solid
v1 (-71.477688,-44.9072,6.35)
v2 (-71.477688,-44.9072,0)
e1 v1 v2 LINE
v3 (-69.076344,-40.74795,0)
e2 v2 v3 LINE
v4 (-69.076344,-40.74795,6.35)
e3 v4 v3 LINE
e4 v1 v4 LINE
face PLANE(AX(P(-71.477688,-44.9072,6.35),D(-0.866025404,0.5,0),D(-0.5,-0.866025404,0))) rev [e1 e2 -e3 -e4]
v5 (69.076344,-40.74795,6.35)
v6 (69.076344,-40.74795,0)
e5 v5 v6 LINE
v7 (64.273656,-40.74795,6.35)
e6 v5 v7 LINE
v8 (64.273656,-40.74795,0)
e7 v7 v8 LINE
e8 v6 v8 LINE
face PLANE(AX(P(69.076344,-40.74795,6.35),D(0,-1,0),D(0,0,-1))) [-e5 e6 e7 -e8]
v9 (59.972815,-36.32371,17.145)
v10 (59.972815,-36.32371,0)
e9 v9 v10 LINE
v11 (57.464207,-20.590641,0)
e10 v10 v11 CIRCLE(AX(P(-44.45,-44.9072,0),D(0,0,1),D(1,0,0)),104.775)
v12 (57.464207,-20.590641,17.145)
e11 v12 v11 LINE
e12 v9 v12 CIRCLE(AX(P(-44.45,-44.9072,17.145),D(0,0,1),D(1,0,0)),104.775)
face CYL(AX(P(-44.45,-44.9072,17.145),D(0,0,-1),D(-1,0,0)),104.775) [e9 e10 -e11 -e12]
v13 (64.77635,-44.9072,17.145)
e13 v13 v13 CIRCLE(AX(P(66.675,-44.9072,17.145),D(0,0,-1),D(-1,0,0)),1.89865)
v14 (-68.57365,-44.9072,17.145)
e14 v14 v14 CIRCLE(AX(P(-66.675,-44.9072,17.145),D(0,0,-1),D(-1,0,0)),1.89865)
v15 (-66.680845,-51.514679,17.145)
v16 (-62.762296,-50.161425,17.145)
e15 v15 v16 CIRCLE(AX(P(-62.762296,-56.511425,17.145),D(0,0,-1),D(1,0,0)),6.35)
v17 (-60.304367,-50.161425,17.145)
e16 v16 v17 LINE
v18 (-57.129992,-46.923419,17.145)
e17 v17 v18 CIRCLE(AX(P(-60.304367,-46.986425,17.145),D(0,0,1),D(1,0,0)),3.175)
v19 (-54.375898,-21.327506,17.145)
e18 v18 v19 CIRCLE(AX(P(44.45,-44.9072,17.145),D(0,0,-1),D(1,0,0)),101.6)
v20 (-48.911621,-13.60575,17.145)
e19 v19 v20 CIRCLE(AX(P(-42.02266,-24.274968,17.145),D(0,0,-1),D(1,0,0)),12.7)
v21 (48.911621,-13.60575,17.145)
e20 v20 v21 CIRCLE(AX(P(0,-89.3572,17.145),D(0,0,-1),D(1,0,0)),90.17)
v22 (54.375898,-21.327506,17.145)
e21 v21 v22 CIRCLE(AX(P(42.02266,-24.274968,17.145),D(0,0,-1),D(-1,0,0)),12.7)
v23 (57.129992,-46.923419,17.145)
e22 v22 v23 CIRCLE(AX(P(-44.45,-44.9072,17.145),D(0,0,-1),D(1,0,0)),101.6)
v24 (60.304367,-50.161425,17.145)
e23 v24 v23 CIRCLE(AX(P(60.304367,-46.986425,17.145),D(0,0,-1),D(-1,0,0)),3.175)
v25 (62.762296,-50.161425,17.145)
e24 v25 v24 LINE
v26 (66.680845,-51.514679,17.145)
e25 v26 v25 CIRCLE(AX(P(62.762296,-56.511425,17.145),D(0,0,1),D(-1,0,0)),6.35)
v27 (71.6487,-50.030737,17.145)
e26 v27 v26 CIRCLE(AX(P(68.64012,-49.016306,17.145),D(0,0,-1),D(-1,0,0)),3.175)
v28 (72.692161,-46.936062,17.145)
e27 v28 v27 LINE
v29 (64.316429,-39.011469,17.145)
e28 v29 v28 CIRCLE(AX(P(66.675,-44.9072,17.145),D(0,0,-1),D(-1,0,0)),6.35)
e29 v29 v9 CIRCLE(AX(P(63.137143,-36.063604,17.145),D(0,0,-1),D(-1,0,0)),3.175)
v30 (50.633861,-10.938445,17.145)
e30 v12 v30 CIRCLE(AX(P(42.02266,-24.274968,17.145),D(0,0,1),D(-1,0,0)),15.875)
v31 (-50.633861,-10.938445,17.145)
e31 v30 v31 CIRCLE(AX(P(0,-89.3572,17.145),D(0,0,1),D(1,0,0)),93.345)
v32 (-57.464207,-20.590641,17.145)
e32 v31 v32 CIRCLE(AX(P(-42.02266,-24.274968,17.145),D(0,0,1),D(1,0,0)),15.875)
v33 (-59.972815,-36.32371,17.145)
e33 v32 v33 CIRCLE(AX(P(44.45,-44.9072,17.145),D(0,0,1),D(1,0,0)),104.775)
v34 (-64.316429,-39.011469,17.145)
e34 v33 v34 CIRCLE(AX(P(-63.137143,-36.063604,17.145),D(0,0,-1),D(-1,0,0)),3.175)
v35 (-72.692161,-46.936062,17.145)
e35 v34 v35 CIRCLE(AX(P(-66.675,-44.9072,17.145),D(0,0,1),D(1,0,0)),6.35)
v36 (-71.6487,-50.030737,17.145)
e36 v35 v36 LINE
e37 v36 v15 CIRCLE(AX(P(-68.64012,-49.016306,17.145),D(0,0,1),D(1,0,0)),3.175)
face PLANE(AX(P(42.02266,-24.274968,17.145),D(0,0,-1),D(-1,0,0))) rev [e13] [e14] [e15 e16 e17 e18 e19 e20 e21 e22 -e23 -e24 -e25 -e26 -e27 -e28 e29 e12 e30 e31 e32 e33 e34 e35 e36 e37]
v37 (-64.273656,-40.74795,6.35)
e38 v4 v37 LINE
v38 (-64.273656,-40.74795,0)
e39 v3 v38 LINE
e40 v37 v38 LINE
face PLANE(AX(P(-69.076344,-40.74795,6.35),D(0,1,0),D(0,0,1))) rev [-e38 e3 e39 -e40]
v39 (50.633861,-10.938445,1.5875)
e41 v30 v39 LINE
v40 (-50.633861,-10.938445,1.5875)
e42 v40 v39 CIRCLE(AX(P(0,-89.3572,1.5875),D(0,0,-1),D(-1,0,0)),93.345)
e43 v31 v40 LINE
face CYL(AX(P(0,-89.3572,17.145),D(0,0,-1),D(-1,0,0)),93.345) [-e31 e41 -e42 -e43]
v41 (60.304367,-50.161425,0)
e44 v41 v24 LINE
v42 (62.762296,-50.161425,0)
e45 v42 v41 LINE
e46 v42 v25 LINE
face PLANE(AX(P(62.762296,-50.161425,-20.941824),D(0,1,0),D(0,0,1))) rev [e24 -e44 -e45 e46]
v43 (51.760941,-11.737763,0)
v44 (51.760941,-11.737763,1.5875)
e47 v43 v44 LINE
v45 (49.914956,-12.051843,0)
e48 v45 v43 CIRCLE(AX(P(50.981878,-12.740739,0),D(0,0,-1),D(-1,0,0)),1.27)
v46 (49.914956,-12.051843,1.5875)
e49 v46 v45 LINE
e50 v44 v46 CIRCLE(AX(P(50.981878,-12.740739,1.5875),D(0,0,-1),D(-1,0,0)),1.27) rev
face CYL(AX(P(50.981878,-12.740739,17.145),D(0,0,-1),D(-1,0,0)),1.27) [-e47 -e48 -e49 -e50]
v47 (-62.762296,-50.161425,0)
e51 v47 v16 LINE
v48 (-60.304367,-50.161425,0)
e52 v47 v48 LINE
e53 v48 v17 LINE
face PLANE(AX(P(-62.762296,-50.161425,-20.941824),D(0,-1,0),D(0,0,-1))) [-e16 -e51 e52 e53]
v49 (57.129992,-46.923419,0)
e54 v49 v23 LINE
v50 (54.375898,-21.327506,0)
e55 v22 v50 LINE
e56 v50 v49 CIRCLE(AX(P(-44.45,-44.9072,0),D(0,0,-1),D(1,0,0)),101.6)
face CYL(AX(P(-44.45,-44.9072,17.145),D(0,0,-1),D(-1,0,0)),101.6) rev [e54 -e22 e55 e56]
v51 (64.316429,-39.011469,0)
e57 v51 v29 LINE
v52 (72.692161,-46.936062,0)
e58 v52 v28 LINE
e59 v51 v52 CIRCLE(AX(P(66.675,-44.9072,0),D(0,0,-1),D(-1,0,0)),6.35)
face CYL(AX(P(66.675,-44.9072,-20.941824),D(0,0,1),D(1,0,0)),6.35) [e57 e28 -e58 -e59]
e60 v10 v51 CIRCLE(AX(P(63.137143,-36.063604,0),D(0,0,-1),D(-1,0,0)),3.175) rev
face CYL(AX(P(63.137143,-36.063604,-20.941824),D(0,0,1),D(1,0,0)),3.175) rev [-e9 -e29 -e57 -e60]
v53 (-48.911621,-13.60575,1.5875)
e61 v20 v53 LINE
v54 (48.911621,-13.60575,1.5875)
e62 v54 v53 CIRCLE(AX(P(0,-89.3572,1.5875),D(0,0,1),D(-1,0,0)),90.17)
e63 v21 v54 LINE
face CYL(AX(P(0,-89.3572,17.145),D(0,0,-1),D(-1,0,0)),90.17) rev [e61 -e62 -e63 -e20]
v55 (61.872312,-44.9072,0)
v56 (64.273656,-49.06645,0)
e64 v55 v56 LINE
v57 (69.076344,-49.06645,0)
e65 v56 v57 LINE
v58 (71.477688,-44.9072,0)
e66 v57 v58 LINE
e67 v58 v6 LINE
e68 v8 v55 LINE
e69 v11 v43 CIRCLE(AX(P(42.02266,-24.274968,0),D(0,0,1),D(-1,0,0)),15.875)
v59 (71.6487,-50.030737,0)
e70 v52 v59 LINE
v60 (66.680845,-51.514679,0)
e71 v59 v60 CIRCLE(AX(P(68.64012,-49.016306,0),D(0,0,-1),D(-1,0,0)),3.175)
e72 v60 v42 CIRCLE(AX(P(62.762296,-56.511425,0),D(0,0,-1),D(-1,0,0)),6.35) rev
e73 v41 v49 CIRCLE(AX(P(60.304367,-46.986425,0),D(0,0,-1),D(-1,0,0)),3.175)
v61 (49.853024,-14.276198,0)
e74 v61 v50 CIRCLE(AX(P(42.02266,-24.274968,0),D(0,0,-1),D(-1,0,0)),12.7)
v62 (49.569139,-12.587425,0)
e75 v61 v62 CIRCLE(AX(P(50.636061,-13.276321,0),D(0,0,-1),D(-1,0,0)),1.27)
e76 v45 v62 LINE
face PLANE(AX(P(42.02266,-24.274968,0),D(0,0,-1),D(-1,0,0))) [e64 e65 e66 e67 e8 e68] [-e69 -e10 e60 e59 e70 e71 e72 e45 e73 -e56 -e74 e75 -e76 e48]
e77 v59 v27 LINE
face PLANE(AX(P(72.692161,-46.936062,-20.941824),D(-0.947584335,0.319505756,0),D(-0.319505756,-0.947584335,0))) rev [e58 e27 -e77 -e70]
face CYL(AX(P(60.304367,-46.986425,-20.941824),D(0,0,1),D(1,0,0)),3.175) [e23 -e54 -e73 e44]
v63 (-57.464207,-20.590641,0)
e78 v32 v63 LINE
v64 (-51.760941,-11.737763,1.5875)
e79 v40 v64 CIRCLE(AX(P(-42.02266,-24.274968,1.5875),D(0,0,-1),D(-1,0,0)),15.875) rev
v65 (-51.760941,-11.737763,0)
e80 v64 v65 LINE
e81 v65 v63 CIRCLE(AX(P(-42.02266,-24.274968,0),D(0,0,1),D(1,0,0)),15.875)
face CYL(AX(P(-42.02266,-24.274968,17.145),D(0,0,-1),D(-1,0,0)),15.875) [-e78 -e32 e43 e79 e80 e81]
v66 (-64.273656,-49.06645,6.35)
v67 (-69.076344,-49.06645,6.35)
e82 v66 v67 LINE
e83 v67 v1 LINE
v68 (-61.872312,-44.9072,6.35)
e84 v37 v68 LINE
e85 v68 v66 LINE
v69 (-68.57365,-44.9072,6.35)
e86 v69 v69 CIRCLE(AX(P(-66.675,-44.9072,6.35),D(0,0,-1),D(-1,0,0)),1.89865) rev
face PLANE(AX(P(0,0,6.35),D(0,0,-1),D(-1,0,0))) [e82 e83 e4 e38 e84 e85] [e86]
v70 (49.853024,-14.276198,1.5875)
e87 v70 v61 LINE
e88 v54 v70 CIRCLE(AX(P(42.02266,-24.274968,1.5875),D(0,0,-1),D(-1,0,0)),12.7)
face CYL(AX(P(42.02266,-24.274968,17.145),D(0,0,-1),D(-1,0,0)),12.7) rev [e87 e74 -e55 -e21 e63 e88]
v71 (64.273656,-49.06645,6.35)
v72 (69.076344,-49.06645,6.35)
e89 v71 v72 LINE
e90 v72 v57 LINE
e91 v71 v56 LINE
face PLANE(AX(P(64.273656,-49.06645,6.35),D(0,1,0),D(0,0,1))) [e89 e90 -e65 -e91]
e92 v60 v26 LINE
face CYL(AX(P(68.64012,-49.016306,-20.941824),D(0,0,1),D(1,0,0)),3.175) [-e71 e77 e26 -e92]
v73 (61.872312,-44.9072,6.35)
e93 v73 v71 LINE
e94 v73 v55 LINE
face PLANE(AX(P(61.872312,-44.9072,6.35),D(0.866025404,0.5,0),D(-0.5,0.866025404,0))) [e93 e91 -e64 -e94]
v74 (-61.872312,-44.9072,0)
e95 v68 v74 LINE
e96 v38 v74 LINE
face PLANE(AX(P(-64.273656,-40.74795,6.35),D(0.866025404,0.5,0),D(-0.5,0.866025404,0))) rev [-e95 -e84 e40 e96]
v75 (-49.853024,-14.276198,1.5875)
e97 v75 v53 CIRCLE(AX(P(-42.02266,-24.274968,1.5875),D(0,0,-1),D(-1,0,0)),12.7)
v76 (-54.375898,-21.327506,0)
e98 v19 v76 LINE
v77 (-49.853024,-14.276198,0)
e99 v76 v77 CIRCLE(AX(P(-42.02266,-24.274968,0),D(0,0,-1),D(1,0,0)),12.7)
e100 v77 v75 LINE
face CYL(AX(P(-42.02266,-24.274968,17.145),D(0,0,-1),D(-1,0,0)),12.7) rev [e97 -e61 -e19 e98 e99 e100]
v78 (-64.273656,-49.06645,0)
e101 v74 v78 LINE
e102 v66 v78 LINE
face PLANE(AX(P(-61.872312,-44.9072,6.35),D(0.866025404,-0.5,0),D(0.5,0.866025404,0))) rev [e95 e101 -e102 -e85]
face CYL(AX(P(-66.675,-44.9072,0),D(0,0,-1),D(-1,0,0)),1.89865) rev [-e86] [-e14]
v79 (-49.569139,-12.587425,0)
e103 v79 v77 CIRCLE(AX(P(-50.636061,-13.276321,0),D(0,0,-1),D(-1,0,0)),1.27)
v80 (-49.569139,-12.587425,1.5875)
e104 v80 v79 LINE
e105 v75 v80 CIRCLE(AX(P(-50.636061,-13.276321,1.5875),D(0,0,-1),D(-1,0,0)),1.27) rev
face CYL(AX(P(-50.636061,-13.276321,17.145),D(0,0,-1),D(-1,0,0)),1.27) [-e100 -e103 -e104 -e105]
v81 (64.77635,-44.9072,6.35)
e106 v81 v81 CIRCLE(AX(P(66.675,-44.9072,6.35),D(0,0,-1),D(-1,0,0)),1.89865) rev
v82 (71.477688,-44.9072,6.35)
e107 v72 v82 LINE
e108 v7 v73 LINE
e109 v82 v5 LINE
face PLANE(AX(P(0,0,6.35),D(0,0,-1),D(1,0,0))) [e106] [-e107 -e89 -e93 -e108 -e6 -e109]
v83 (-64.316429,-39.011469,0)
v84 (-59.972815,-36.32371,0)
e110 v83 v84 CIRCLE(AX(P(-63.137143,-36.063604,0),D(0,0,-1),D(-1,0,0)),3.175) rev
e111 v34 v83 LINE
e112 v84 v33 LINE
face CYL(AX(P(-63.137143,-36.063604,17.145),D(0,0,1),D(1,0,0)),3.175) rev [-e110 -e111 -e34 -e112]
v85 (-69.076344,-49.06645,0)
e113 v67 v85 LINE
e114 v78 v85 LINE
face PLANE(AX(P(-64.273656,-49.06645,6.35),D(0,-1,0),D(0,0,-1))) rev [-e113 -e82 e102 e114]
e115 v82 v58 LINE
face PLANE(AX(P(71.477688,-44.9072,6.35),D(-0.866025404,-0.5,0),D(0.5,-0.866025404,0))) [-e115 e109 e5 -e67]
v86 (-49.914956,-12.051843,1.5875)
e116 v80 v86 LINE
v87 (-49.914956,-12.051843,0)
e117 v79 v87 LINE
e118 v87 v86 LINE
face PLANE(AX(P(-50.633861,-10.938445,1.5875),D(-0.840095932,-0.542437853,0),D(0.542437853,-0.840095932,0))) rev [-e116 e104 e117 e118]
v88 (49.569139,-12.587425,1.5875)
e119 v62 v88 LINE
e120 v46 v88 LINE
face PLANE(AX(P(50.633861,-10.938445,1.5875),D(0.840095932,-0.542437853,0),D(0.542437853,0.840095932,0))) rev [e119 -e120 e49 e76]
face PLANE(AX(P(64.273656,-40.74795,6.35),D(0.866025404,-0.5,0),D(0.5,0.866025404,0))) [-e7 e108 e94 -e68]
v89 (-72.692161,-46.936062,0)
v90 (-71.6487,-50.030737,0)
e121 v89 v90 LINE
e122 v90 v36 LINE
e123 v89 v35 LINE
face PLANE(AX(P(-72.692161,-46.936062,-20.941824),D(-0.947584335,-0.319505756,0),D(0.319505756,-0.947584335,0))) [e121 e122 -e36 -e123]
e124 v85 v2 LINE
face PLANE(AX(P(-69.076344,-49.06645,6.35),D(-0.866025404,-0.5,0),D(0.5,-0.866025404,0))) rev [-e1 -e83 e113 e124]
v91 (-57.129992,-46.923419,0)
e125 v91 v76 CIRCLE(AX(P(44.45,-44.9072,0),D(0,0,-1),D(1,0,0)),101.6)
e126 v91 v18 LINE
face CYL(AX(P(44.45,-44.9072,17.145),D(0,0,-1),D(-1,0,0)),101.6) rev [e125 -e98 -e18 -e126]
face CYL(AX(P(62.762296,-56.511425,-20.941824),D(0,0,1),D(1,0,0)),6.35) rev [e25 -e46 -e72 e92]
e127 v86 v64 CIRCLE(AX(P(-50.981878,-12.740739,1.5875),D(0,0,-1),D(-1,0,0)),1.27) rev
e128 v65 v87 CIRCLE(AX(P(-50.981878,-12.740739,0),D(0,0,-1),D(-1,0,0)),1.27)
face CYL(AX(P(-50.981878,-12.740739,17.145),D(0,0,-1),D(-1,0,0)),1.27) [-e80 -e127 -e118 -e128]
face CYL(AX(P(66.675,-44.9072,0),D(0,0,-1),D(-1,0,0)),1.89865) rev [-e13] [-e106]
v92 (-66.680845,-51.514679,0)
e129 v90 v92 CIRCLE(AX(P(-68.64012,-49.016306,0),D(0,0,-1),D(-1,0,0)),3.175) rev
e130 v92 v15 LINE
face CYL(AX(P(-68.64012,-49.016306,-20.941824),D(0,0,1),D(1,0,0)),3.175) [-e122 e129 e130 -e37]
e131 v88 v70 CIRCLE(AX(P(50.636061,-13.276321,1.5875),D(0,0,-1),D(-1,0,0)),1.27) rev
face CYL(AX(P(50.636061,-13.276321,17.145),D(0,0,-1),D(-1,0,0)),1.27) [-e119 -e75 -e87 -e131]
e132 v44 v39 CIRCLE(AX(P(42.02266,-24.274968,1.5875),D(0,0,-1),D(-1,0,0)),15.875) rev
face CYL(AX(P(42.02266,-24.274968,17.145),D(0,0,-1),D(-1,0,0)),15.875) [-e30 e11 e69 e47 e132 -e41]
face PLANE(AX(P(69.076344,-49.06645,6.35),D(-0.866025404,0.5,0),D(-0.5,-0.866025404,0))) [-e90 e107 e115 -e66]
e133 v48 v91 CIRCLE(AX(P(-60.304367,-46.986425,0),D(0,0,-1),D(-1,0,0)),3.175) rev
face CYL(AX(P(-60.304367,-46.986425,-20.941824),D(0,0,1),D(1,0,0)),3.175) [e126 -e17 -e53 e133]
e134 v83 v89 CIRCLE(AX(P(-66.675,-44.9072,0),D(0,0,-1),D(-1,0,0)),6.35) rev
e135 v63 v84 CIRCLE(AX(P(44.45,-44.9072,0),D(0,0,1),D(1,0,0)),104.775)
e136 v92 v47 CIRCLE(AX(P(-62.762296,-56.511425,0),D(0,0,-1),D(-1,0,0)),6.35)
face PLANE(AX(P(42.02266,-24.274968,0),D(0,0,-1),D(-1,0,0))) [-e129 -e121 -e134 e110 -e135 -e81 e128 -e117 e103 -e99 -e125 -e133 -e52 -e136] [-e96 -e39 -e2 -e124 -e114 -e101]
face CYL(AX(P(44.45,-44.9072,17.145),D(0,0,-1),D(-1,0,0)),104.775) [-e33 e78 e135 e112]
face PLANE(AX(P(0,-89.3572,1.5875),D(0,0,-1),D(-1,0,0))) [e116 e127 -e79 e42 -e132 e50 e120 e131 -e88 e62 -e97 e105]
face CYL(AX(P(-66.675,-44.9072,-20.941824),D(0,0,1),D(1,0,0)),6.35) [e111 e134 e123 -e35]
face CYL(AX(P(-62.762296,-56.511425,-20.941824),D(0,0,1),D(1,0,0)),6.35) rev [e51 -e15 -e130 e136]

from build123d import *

# Parameters (mm, degrees)
BOSS_EXTRUDE1_DEPTH   = 17.145
BOSS_EXTRUDE2_START   = -17.145
BOSS_EXTRUDE2_DEPTH   = 17.145
F_6_CLEARANCE_HOLE3_D = 3.7973
CUT_EXTRUDE2_DEPTH    = 6.35
FILLET1_R             = 3.175
CUT_EXTRUDE3_DEPTH    = 1.5875
FILLET2_R             = 1.27


with BuildPart() as part:
    # Sketch1 → Boss-Extrude1 (new body)
    with BuildSketch(Plane.XY):
        with BuildLine():
            Line((-60.325, -44.9072), (-57.15, -44.9072))
            ThreePointArc((-57.15, -44.9072), (-56.454091105, -33.036041743), (-54.37589767, -21.327506412))
            ThreePointArc((-54.37589767, -21.327506412), (-52.38952724, -16.938887877), (-48.911621193, -13.605749768))
            ThreePointArc((-48.911621193, -13.605749768), (0, 0.8128), (48.911621193, -13.605749768))
            ThreePointArc((48.911621193, -13.605749768), (52.38952724, -16.938887877), (54.37589767, -21.327506412))
            ThreePointArc((54.37589767, -21.327506412), (56.454091105, -33.036041743), (57.15, -44.9072))
            Line((57.15, -44.9072), (60.325, -44.9072))
            ThreePointArc((60.325, -44.9072), (59.607343952, -32.665068047), (57.464206972, -20.590640987))
            ThreePointArc((57.464206972, -20.590640987), (54.981243935, -15.104867818), (50.633861375, -10.938445182))
            ThreePointArc((50.633861375, -10.938445182), (0, 3.9878), (-50.633861375, -10.938445182))
            ThreePointArc((-50.633861375, -10.938445182), (-54.981243935, -15.104867818), (-57.464206972, -20.590640987))
            ThreePointArc((-57.464206972, -20.590640987), (-59.607343952, -32.665068047), (-60.325, -44.9072))
        make_face()
    extrude(amount=BOSS_EXTRUDE1_DEPTH)

    # Sketch5 → Boss-Extrude2 (add)
    with BuildSketch(Plane.XY.offset(17.145).offset(BOSS_EXTRUDE2_START)):
        with BuildLine():
            Line((-72.692160527, -46.93606155), (-71.648700283, -50.030736885))
            ThreePointArc((-71.648700283, -50.030736885), (-69.548845385, -52.05848349), (-66.680845425, -51.514679193))
            ThreePointArc((-66.680845425, -51.514679193), (-64.835115794, -50.509265825), (-62.762296236, -50.16142536))
            Line((-62.762296236, -50.16142536), (-60.304367197, -50.16142536))
            ThreePointArc((-60.304367197, -50.16142536), (-58.037136322, -49.209101486), (-57.129992434, -46.923418531))
            ThreePointArc((-57.129992434, -46.923418531), (-57.144997985, -45.9153589), (-57.15, -44.9072))
            Line((-57.15, -44.9072), (-60.325, -44.9072))
            ThreePointArc((-60.325, -44.9072), (-67.702990917, -38.640962319), (-72.692160527, -46.93606155))
        make_face()
    boss_extrude2 = extrude(amount=BOSS_EXTRUDE2_DEPTH)

    # #6 Clearance Hole3 (through all)
    with Locations(Plane(origin=(0, 0, 0), x_dir=(-1, 0, 0), z_dir=(0, 0, -1))):
        with Locations((66.675, -44.9072)):
            f_6_clearance_hole3 = Hole(F_6_CLEARANCE_HOLE3_D / 2)

    # Sketch9 → Cut-Extrude2 (cut)
    with BuildSketch(Plane(origin=(0, 0, 0), x_dir=(-1, 0, 0), z_dir=(0, 0, -1))):
        Polygon((69.076344107, -40.74795), (64.273655893, -40.74795), (61.872311786, -44.9072), (64.273655893, -49.06645), (69.076344107, -49.06645), (71.477688214, -44.9072), align=None)
    cut_extrude2 = extrude(amount=-CUT_EXTRUDE2_DEPTH, mode=Mode.SUBTRACT)

    # Mirror1: Boss-Extrude2, #6 Clearance Hole3, Cut-Extrude2 across plane
    add(boss_extrude2.mirror(Plane(origin=(0, 0, 0), x_dir=(0, 0, 1), z_dir=(1, 0, 0))))
    add(f_6_clearance_hole3.mirror(Plane(origin=(0, 0, 0), x_dir=(0, 0, 1), z_dir=(1, 0, 0))), mode=Mode.SUBTRACT)
    add(cut_extrude2.mirror(Plane(origin=(0, 0, 0), x_dir=(0, 0, 1), z_dir=(1, 0, 0))), mode=Mode.SUBTRACT)

    # Fillet1
    # the kernel refuses this fillet: 3.175 mm, written as the material it adds along each edge
    with BuildSketch(Plane(origin=(60.325, -44.9072, 0), x_dir=(0.5606119105814275, 0.8280786712107985, 0), z_dir=(0, 0, 1))) as fillet1_piece_1:
        with BuildLine():
            CenterArc((8.89971408, 2.629149781), FILLET1_R, 128.797238818, 107.104635177)
            Line((6.910366227, 5.103643693), (6.87057927, 5.153133571))
            ThreePointArc((6.87057927, 5.153133571), (3.469787737, 2.532047093), (-0.035598856, 0.052582996))
            Line((-0.035598856, 0.052582996), (0.035598856, -0.052582996))
            ThreePointArc((0.035598856, -0.052582996), (3.559885632, 1.028200438), (7.084172408, -0.052582996))
            Line((7.084172408, -0.052582996), (7.119771264, 0))
        make_face()
    extrude(amount=17.145)
    fillet1_2_edges = [part.edges().sort_by_distance(p)[0] for p in [
        (-60.325, -44.9072, 8.5725),
    ]]
    fillet(fillet1_2_edges, radius=FILLET1_R)

    # Sketch10 → Cut-Extrude3 (cut)
    with BuildSketch(Plane(origin=(0, 0, 0), x_dir=(-1, 0, 0), z_dir=(0, 0, -1))):
        with BuildLine():
            Line((-50.633861375, -10.938445182), (-48.911621193, -13.605749768))
            ThreePointArc((-48.911621193, -13.605749768), (0, 0.8128), (48.911621193, -13.605749768))
            Line((48.911621193, -13.605749768), (50.633861375, -10.938445182))
            ThreePointArc((50.633861375, -10.938445182), (0, 3.9878), (-50.633861375, -10.938445182))
        make_face()
    extrude(amount=-CUT_EXTRUDE3_DEPTH, mode=Mode.SUBTRACT)

    # Fillet2
    fillet2_edges = [part.edges().sort_by_distance(p)[0] for p in [
        (50.633861375, -10.938445182, 0.79375),
        (-50.633861375, -10.938445182, 0.79375),
        (-48.911621193, -13.605749768, 0.79375),
        (48.911621193, -13.605749768, 0.79375),
    ]]
    fillet(fillet2_edges, radius=FILLET2_R)


solid = part.part
